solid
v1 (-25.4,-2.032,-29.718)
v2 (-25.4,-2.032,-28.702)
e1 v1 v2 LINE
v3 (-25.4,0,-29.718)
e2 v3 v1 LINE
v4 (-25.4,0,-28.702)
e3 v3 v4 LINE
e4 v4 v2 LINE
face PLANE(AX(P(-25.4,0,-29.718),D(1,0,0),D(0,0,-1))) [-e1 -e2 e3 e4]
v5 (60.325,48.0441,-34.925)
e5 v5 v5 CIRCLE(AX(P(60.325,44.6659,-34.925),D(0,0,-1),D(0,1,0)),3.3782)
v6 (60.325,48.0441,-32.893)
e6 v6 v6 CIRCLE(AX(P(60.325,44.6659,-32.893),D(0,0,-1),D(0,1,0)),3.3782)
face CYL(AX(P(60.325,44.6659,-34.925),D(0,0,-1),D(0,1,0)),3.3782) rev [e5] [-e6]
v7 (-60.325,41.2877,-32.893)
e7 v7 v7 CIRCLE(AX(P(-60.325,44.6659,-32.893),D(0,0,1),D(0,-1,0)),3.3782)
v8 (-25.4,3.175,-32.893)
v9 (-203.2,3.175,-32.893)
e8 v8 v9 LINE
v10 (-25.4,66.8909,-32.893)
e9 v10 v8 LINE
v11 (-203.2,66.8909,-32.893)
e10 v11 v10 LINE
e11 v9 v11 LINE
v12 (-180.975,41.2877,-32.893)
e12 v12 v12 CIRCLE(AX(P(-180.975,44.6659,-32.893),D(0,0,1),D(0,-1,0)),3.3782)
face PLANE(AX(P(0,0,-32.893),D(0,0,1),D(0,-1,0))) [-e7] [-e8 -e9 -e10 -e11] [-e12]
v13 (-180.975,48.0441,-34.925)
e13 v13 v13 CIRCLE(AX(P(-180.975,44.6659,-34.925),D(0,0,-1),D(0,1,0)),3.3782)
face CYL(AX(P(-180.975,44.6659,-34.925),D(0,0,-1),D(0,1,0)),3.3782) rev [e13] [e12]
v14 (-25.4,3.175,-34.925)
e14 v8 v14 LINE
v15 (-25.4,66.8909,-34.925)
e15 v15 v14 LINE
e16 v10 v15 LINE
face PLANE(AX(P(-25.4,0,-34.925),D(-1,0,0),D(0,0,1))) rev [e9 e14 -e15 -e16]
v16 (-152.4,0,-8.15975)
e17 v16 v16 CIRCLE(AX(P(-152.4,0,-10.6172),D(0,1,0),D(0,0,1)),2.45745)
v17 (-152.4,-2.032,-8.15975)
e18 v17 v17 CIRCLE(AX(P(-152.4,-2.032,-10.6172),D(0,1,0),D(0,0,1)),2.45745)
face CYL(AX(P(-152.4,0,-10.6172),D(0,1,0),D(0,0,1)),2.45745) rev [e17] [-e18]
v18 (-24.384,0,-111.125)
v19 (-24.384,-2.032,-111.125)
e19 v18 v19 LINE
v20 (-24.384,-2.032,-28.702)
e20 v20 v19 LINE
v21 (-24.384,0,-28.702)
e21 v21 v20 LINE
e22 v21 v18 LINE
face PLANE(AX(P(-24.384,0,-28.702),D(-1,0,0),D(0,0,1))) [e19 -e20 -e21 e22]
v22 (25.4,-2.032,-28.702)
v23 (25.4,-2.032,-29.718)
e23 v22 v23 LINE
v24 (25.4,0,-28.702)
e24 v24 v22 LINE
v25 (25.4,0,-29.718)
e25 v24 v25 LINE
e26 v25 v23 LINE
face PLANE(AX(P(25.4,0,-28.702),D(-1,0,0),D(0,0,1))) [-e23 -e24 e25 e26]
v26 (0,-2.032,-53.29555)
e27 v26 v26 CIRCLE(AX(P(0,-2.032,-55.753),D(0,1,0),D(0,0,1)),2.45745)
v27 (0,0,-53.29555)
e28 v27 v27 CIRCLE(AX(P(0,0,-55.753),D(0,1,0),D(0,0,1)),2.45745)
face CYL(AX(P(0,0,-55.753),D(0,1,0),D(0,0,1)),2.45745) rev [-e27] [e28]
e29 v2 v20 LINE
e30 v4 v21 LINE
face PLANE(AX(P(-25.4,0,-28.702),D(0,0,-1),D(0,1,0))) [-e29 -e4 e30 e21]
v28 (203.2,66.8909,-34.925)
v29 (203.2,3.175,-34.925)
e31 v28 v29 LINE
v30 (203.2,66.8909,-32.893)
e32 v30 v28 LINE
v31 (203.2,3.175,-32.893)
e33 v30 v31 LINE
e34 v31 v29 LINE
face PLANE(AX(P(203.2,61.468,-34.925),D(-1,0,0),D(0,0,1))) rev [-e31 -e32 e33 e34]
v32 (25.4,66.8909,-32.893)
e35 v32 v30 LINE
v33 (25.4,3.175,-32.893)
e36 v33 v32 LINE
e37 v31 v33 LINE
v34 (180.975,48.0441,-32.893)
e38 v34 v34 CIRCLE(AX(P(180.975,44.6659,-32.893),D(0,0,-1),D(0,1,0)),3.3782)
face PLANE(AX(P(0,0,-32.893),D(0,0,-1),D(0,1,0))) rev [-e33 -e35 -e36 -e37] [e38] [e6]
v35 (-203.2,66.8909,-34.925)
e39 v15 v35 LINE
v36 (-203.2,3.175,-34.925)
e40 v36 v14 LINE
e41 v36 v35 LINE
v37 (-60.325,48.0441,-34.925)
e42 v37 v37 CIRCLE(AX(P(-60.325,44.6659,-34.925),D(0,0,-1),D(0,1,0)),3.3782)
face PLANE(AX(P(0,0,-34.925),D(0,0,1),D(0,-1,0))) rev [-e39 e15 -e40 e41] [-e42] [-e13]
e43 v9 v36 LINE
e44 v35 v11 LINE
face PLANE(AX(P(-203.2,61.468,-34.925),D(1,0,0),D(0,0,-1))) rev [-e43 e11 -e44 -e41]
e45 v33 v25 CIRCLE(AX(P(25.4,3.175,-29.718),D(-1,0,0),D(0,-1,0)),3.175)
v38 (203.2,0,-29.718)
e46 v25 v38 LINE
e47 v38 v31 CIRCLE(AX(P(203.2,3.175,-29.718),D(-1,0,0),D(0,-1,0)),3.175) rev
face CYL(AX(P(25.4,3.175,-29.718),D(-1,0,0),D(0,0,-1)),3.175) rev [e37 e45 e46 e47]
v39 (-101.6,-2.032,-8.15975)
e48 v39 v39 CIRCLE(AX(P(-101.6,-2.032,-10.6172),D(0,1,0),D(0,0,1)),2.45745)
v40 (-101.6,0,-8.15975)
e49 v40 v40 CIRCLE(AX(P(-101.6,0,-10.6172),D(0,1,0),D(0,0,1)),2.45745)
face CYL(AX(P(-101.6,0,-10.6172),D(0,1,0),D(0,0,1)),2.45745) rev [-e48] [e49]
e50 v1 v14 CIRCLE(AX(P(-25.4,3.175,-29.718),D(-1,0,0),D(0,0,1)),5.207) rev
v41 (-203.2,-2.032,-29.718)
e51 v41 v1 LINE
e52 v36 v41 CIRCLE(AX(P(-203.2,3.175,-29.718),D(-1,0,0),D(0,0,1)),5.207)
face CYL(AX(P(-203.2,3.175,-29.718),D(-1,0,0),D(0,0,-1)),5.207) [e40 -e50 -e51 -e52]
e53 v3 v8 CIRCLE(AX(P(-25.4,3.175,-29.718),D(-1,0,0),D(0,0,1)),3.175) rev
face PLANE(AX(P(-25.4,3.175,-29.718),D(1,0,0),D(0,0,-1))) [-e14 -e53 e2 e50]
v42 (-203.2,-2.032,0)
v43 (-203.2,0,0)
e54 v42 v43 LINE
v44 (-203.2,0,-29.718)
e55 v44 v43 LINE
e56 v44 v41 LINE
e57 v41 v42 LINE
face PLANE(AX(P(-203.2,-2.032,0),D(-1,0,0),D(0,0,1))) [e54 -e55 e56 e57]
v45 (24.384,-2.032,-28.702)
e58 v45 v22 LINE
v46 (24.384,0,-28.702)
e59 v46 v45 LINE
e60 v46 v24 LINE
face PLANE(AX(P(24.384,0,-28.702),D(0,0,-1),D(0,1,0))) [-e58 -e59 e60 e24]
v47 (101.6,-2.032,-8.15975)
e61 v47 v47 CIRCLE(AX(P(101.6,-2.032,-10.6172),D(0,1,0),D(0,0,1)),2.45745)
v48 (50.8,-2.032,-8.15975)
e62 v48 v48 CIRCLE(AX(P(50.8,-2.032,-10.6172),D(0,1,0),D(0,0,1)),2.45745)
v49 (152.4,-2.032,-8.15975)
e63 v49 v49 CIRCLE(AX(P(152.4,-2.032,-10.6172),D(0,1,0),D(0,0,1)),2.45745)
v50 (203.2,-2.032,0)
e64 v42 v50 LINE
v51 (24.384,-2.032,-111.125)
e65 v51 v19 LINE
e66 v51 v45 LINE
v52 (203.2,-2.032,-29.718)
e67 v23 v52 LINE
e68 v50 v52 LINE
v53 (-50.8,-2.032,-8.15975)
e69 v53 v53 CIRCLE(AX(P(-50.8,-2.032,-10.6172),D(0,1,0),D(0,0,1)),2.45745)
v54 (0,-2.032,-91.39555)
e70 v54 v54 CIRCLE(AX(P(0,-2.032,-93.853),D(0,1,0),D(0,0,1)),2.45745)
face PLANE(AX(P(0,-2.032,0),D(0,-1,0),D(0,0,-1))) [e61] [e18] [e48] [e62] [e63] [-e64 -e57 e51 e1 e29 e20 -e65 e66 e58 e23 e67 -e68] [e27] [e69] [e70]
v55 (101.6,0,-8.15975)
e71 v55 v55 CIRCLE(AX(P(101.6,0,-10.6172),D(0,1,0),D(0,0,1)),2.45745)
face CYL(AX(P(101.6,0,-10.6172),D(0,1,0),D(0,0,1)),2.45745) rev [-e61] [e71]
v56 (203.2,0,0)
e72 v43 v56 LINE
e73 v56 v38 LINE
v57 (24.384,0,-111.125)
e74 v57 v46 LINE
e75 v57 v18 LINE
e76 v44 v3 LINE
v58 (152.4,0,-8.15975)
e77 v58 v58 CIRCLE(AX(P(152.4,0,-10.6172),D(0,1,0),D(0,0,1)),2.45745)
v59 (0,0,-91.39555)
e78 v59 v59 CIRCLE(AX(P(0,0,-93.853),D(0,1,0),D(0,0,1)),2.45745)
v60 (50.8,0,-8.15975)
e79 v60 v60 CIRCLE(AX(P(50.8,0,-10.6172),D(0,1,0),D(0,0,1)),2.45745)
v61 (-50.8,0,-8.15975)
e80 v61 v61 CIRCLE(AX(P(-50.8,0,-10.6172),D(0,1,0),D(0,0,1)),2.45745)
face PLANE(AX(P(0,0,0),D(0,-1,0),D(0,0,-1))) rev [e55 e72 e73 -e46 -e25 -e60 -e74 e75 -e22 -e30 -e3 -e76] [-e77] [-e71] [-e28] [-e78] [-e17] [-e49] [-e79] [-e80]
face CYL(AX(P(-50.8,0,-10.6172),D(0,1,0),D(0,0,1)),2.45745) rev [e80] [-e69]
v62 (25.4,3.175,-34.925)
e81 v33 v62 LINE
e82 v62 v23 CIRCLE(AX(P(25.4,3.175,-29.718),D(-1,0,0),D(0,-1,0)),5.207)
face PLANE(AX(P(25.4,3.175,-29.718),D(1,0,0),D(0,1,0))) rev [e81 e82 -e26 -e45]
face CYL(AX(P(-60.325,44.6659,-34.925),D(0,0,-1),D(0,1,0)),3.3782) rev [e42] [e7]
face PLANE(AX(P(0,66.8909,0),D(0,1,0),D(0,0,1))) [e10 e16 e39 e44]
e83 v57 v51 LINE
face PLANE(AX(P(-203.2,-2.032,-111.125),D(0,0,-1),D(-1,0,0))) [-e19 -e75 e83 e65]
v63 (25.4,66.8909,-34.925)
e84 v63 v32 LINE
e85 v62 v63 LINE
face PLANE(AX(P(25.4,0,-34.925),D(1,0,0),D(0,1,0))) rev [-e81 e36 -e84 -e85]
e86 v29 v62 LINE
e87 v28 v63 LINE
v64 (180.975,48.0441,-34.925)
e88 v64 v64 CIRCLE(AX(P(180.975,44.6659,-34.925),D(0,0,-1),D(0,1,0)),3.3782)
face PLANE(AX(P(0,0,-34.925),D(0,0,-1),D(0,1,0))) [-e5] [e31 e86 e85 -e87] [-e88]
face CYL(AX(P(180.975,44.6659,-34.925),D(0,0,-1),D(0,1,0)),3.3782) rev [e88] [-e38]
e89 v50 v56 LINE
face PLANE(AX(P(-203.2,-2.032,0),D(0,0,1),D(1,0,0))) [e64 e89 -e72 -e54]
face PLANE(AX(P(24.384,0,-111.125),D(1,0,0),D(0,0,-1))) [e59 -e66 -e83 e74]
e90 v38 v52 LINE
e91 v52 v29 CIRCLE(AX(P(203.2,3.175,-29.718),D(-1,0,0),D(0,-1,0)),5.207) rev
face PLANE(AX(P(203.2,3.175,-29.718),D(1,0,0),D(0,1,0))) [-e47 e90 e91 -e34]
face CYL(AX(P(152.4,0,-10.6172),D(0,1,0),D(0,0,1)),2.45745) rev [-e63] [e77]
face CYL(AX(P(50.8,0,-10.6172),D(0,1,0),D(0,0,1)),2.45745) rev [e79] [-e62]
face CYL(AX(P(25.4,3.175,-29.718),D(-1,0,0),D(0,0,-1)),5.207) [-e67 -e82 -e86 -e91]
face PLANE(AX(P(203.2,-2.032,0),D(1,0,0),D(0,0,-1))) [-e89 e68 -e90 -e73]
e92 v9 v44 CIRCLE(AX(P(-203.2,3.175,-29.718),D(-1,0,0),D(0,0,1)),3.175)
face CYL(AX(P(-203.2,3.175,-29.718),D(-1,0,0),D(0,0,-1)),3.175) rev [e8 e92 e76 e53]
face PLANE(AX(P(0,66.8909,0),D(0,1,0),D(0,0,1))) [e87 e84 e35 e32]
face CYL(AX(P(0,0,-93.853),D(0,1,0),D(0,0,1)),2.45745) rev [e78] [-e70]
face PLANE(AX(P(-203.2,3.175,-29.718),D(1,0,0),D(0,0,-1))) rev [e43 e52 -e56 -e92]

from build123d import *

# Parameters (mm, degrees)
SKETCH1_W                    = 406.4
SKETCH1_H                    = 111.125
BASE_FLANGE1_DEPTH           = 2.032
EDGE_FLANGE2_START           = -203.2
EDGE_FLANGE2_DEPTH           = 178.816
EDGE_FLANGE2_START_2         = -25.4
EDGE_FLANGE2_2_DEPTH         = 1.016
EDGE_FLANGE2_3_DEPTH         = 177.8
EDGE_FLANGE3_START           = 24.384
EDGE_FLANGE3_DEPTH           = 178.816
EDGE_FLANGE3_2_DEPTH         = 1.016
EDGE_FLANGE3_START_2         = 25.4
EDGE_FLANGE3_3_DEPTH         = 177.8
SKETCH24_W                   = 177.8
SKETCH24_H                   = 2.032
BOSS_EXTRUDE1_DEPTH          = 5.4229
F_10_0_1935_DIAMETER_HOLE1_D = 4.9149
F_1_4_CLEARANCE_HOLE1_D      = 6.7564


# Read off the part's stored shape, not the designer's step: Edge-Flange2, Edge-Flange3
# Sheet-metal steps are written as plain solids
with BuildPart() as part:
    # Sketch1 → Base-Flange1 (new body)
    with BuildSketch(Plane(origin=(0, 0, 0), x_dir=(1, 0, 0), z_dir=(0, 1, 0))):
        with Locations((0, 55.5625)):
            Rectangle(SKETCH1_W, SKETCH1_H)
    extrude(amount=-BASE_FLANGE1_DEPTH)

    # Edge-Flange2 outline → Edge-Flange2 (cut)
    with BuildSketch(Plane.YZ.offset(EDGE_FLANGE2_START)):
        with BuildLine():
            ThreePointArc((0, -33.84501151), (-1.496459836, -32.018067825), (-2.032, -29.718))
            Line((-2.032, -29.718), (-2.032, -111.125))
            Line((-2.032, -111.125), (0, -111.125))
            Line((0, -111.125), (0, -33.84501151))
        make_face()
    extrude(amount=EDGE_FLANGE2_DEPTH, mode=Mode.SUBTRACT)

    # Edge-Flange2 2 outline → Edge-Flange2 2 (cut)
    with BuildSketch(Plane.YZ.offset(EDGE_FLANGE2_START_2)):
        with BuildLine():
            Line((0, -28.702), (-2.032, -28.702))
            Line((-2.032, -28.702), (-2.032, -29.718))
            ThreePointArc((-2.032, -29.718), (-1.496459836, -32.018067825), (0, -33.84501151))
            Line((0, -33.84501151), (0, -28.702))
        make_face()
    extrude(amount=EDGE_FLANGE2_2_DEPTH, mode=Mode.SUBTRACT)

    # Edge-Flange2 3 outline → Edge-Flange2 3 (add)
    with BuildSketch(Plane.YZ.offset(EDGE_FLANGE2_START)):
        with BuildLine():
            ThreePointArc((3.175, -32.893), (0.92993597, -31.96306403), (0, -29.718))
            Line((0, -29.718), (0, -33.84501151))
            ThreePointArc((0, -33.84501151), (1.498172628, -34.647614485), (3.175, -34.925))
            Line((3.175, -34.925), (61.468, -34.925))
            Line((61.468, -34.925), (61.468, -32.893))
            Line((61.468, -32.893), (3.175, -32.893))
        make_face()
    extrude(amount=EDGE_FLANGE2_3_DEPTH)

    # Edge-Flange3 outline → Edge-Flange3 (cut)
    with BuildSketch(Plane.YZ.offset(EDGE_FLANGE3_START)):
        with BuildLine():
            ThreePointArc((0, -33.84501151), (-1.496459836, -32.018067825), (-2.032, -29.718))
            Line((-2.032, -29.718), (-2.032, -111.125))
            Line((-2.032, -111.125), (0, -111.125))
            Line((0, -111.125), (0, -33.84501151))
        make_face()
    extrude(amount=EDGE_FLANGE3_DEPTH, mode=Mode.SUBTRACT)

    # Edge-Flange3 2 outline → Edge-Flange3 2 (cut)
    with BuildSketch(Plane.YZ.offset(EDGE_FLANGE3_START)):
        with BuildLine():
            Line((0, -28.702), (-2.032, -28.702))
            Line((-2.032, -28.702), (-2.032, -29.718))
            ThreePointArc((-2.032, -29.718), (-1.496459836, -32.018067825), (0, -33.84501151))
            Line((0, -33.84501151), (0, -28.702))
        make_face()
    extrude(amount=EDGE_FLANGE3_2_DEPTH, mode=Mode.SUBTRACT)

    # Edge-Flange3 3 outline → Edge-Flange3 3 (add)
    with BuildSketch(Plane.YZ.offset(EDGE_FLANGE3_START_2)):
        with BuildLine():
            ThreePointArc((3.175, -32.893), (0.92993597, -31.96306403), (0, -29.718))
            Line((0, -29.718), (0, -33.84501151))
            ThreePointArc((0, -33.84501151), (1.498172628, -34.647614485), (3.175, -34.925))
            Line((3.175, -34.925), (61.468, -34.925))
            Line((61.468, -34.925), (61.468, -32.893))
            Line((61.468, -32.893), (3.175, -32.893))
        make_face()
    extrude(amount=EDGE_FLANGE3_3_DEPTH)

    # Sketch24 → Boss-Extrude1 (add)
    with BuildSketch(Plane(origin=(0, 61.468, 0), x_dir=(1, 0, 0), z_dir=(0, 1, 0))):
        with Locations((-114.3, 33.909)):
            Rectangle(SKETCH24_W, SKETCH24_H)
        with Locations((114.3, 33.909)):
            Rectangle(SKETCH24_W, SKETCH24_H)
    extrude(amount=BOSS_EXTRUDE1_DEPTH)

    # #10 (0.1935) Diameter Hole1 (through all)
    with Locations(Plane(origin=(0, 0, 0), x_dir=(1, 0, 0), z_dir=(0, 1, 0))):
        with Locations((0, 93.853), (0, 55.753), (-152.4, 10.6172), (-50.8, 10.6172), (152.4, 10.6172), (50.8, 10.6172), (101.6, 10.6172), (-101.6, 10.6172)):
            Hole(F_10_0_1935_DIAMETER_HOLE1_D / 2)

    # 1/4 Clearance Hole1 (through all)
    with Locations(Plane(origin=(0, 0, -34.925), x_dir=(-1, 0, 0), z_dir=(0, 0, -1))):
        with Locations((180.975, 44.6659), (60.325, 44.6659), (-180.975, 44.6659), (-60.325, 44.6659)):
            Hole(F_1_4_CLEARANCE_HOLE1_D / 2)


solid = part.part
